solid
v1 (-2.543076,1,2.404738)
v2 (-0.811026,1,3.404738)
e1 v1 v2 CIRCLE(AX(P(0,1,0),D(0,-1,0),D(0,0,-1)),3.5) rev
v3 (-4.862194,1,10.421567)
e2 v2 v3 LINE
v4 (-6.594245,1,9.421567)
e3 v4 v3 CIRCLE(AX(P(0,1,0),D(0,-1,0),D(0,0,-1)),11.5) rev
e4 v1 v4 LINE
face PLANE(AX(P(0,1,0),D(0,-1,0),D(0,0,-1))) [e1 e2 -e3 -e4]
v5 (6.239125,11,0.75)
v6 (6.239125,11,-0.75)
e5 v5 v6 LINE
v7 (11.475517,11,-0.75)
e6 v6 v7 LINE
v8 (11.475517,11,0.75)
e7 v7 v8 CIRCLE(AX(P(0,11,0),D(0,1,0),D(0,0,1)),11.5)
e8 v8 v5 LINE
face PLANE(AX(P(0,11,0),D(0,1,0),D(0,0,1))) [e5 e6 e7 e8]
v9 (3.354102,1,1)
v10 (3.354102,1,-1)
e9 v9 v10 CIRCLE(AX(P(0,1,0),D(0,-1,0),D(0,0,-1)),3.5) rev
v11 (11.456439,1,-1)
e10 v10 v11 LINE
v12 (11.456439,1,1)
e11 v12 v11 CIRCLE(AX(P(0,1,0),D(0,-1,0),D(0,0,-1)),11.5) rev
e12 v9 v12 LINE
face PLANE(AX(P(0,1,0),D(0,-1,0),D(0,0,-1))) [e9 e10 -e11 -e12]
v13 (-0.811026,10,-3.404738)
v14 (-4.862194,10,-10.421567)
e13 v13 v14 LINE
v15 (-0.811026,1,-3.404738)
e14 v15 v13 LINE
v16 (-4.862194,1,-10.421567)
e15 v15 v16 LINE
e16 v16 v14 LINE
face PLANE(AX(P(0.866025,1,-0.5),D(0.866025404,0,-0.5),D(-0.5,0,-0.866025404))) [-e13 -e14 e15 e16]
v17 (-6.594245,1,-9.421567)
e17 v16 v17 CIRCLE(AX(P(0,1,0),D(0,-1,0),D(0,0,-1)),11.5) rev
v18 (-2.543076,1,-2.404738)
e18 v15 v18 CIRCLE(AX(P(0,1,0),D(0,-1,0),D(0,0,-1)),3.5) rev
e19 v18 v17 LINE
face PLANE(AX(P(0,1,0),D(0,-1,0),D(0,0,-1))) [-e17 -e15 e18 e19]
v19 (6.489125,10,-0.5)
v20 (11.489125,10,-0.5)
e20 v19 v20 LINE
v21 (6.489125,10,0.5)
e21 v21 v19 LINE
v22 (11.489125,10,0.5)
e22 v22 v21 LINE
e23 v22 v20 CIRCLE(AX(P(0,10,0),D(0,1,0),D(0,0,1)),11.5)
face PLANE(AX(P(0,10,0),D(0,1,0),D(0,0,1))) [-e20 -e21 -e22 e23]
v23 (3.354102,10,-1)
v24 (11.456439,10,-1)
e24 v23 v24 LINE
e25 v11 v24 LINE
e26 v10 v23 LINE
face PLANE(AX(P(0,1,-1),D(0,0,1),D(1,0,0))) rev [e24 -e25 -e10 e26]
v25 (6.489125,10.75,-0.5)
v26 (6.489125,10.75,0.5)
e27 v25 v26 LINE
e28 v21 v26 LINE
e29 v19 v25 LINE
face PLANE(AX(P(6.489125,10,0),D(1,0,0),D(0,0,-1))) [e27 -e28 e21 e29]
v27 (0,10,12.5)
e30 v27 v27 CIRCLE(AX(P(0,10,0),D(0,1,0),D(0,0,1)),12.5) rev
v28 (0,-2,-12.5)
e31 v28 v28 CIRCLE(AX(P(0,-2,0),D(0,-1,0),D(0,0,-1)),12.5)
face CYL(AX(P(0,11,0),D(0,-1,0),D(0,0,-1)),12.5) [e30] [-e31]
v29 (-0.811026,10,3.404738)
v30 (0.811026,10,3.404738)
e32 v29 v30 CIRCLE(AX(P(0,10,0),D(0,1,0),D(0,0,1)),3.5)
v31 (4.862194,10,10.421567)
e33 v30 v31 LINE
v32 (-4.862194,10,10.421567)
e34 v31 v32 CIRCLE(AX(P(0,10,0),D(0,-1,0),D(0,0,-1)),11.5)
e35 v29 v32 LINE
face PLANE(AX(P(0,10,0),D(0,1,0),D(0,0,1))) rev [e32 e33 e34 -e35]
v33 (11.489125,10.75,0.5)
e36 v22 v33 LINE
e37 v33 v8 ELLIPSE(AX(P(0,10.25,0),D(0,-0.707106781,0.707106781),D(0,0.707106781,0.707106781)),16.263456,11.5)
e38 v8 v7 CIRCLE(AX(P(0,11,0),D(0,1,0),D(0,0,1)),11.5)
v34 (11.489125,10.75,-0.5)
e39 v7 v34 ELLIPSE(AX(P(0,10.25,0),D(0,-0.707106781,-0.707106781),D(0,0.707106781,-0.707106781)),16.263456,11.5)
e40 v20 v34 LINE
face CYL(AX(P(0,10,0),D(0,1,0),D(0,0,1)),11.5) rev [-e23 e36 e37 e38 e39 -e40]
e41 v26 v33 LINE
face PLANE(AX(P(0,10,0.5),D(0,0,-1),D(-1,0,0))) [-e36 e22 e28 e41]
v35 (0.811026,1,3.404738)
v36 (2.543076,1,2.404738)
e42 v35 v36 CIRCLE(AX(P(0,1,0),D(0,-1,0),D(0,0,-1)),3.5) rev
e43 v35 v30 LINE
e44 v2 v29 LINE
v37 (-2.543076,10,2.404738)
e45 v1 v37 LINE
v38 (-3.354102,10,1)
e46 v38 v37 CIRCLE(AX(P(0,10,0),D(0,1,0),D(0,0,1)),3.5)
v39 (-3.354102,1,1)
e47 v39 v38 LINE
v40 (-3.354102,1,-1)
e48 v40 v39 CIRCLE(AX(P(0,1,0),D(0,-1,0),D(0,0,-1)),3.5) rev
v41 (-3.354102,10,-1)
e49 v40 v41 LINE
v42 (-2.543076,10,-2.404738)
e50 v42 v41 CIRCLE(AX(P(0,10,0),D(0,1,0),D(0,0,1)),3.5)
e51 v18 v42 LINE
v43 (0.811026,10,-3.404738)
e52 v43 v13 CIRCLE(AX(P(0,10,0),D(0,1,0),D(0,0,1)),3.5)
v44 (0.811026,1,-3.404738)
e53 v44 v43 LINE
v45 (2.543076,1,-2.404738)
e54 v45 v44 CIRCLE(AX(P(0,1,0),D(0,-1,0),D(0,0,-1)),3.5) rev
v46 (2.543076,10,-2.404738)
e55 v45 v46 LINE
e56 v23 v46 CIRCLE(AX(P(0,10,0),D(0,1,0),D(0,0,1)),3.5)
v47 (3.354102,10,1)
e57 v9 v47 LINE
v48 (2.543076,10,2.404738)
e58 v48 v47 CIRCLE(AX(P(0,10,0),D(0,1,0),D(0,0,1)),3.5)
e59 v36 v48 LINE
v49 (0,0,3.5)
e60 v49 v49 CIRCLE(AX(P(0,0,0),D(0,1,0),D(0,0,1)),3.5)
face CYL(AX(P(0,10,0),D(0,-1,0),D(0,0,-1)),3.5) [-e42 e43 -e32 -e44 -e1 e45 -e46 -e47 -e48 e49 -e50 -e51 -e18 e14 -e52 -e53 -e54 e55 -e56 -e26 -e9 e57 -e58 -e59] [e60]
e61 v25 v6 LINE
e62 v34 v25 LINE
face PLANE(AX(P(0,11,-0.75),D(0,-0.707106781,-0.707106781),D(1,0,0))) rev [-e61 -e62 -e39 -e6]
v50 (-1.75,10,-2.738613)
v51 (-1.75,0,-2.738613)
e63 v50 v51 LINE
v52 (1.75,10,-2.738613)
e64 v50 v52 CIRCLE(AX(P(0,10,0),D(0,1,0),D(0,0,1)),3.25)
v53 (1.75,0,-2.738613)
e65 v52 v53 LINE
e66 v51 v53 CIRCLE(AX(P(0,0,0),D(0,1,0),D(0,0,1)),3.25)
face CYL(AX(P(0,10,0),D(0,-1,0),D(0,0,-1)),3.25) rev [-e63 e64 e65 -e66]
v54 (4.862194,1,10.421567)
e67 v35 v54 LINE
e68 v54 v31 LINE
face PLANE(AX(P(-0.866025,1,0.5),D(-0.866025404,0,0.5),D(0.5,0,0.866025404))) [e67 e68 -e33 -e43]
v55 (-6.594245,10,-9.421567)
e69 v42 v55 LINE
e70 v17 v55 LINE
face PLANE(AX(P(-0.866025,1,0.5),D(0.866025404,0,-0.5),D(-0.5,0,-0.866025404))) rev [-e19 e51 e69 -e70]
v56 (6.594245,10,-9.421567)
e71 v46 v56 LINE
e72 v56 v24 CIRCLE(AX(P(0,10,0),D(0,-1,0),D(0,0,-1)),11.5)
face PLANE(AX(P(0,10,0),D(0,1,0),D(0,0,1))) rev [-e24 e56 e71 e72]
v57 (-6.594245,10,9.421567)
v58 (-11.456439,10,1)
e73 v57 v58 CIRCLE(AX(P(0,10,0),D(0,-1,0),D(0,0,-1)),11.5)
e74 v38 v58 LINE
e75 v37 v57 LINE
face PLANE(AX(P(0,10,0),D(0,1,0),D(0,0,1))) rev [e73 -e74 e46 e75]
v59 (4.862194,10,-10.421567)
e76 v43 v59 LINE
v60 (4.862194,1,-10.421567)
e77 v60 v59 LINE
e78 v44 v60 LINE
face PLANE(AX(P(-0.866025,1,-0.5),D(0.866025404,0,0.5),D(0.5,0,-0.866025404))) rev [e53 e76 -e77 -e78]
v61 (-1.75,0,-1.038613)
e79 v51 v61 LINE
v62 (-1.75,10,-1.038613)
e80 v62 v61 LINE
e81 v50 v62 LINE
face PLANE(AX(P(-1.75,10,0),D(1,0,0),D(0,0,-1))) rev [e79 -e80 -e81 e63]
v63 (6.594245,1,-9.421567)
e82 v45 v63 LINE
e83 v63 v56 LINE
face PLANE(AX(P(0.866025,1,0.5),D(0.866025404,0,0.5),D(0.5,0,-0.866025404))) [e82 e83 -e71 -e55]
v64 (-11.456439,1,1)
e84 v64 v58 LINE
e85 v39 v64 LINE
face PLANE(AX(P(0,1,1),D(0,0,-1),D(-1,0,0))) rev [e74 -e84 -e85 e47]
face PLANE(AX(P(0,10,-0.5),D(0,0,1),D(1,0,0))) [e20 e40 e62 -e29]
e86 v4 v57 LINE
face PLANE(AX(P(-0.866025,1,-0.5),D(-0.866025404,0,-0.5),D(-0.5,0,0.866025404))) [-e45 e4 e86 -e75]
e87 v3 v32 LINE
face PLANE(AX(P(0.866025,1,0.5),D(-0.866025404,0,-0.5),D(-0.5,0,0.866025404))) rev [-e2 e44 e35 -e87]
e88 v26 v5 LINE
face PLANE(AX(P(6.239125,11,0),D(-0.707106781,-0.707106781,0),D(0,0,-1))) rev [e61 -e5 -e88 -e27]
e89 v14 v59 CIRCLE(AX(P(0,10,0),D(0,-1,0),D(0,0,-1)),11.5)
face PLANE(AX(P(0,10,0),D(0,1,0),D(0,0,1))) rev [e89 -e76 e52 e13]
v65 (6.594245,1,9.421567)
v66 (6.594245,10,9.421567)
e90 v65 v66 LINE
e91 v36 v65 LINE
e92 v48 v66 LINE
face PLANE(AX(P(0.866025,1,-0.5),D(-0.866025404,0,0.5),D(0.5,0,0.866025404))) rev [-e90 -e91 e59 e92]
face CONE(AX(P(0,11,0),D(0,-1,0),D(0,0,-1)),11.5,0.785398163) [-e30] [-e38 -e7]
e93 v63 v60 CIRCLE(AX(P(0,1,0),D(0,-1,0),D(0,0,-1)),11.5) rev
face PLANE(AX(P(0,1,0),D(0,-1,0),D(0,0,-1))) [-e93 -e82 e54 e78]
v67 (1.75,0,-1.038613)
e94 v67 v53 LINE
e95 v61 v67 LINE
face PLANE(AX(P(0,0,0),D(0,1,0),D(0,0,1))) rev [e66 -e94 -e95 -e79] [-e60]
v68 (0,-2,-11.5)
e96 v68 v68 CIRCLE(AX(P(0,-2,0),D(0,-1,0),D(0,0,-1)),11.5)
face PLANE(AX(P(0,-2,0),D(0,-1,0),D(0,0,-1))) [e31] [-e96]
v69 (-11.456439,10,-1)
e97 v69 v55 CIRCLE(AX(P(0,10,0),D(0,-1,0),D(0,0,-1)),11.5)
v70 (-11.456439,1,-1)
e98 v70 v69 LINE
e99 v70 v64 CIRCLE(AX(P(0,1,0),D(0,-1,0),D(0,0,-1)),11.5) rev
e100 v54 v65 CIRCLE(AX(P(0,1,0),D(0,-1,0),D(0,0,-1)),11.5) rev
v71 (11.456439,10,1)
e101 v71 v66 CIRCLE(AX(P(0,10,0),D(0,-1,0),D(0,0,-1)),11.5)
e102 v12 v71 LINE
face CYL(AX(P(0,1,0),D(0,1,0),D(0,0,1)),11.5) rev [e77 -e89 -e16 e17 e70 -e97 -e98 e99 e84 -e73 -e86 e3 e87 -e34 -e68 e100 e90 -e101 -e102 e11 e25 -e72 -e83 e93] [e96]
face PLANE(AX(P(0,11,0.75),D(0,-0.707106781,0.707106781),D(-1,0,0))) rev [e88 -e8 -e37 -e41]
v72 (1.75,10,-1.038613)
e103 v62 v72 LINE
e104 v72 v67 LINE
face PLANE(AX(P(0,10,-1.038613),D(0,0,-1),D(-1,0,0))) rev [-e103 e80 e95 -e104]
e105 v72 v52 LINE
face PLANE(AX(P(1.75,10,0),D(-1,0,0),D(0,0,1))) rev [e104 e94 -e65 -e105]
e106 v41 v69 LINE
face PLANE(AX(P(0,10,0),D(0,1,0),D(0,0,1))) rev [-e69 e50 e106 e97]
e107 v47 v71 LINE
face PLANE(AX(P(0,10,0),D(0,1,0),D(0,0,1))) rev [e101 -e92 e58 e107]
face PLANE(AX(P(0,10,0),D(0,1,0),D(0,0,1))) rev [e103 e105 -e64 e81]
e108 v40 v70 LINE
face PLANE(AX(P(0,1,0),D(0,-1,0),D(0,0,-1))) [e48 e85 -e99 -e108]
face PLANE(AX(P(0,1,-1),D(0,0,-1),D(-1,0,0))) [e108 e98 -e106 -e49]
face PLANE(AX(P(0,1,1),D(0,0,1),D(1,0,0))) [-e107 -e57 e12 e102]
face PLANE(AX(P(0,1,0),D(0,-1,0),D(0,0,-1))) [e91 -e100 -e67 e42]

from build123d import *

# Parameters (mm, degrees)
SKETCH1_R           = 3.5
BOSS_EXTRUDE1_DEPTH = 10
SKETCH2_R           = 12.5
BOSS_EXTRUDE2_DEPTH = 1
BOSS_EXTRUDE3_START = 9
SKETCH3_R           = 12.5
SKETCH3_R_2         = 11.5
BOSS_EXTRUDE3_DEPTH = 9
BOSS_EXTRUDE4_START = 12
SKETCH3_4_R         = 12.5
SKETCH3_4_R_2       = 11.5
BOSS_EXTRUDE4_DEPTH = 12
CHAMFER1_SIZE       = 1
CUT_EXTRUDE4_START  = -1
CUT_EXTRUDE4_DEPTH  = 1
CHAMFER2_SIZE       = 0.25


with BuildPart() as part:
    # Sketch1 → Boss-Extrude1 (new body)
    with BuildSketch(Plane(origin=(0, 0, 0), x_dir=(1, 0, 0), z_dir=(0, 1, 0))):
        with Locations(Location((0, 0, 0), (0, 0, 270))):
            Circle(SKETCH1_R)
        with BuildLine():
            Line((-1.75, 1.038612788), (1.75, 1.038612788))
            Line((1.75, 1.038612788), (1.75, 2.738612788))
            ThreePointArc((1.75, 2.738612788), (0, -3.25), (-1.75, 2.738612788))
            Line((-1.75, 2.738612788), (-1.75, 1.038612788))
        make_face(mode=Mode.SUBTRACT)
    extrude(amount=BOSS_EXTRUDE1_DEPTH)

    # Sketch2 → Boss-Extrude2 (add)
    with BuildSketch(Plane(origin=(0, 10, 0), x_dir=(1, 0, 0), z_dir=(0, 1, 0))):
        with Locations(Location((0, 0, 0), (0, 0, 270))):
            Circle(SKETCH2_R)
    extrude(amount=BOSS_EXTRUDE2_DEPTH)

    # Sketch3 → Boss-Extrude3 (add)
    # profile 1 of 8: a face of its own
    with BuildSketch(Plane.XZ.offset(-10).offset(BOSS_EXTRUDE3_START)):
        with Locations(Location((0, 0, 0), (0, 0, 270))):
            Circle(SKETCH3_R)
        Circle(SKETCH3_R_2, mode=Mode.SUBTRACT)
    # profile 2 of 8: a face of its own
    with BuildSketch(Plane.XZ.offset(-10).offset(BOSS_EXTRUDE3_START)):
        with BuildLine():
            Line((-6.594245022, 9.421567416), (-2.543076387, 2.40473751))
            ThreePointArc((-2.543076387, 2.40473751), (-1.75, 3.031088913), (-0.811025579, 3.40473751))
            Line((-0.811025579, 3.40473751), (-4.862194215, 10.421567416))
            ThreePointArc((-4.862194215, 10.421567416), (-5.75, 9.959292144), (-6.594245022, 9.421567416))
        make_face()
    # profile 3 of 8: a face of its own
    with BuildSketch(Plane.XZ.offset(-10).offset(BOSS_EXTRUDE3_START)):
        with BuildLine():
            Line((-11.5, 0), (-3.5, 0))
            ThreePointArc((-3.5, 0), (-3.463333429, 0.505293538), (-3.354101966, 1))
            Line((-3.354101966, 1), (-11.456439237, 1))
            ThreePointArc((-11.456439237, 1), (-11.489104648, 0.50047416), (-11.5, 0))
        make_face()
    # profile 4 of 8: a face of its own
    with BuildSketch(Plane.XZ.offset(-10).offset(BOSS_EXTRUDE3_START)):
        with BuildLine():
            ThreePointArc((-3.354101966, -1), (-3.463333429, -0.505293538), (-3.5, 0))
            Line((-3.5, 0), (-11.5, 0))
            ThreePointArc((-11.5, 0), (-11.489104648, -0.50047416), (-11.456439237, -1))
            Line((-11.456439237, -1), (-3.354101966, -1))
        make_face()
    # profile 5 of 8: a face of its own
    with BuildSketch(Plane.XZ.offset(-10).offset(BOSS_EXTRUDE3_START)):
        with BuildLine():
            Line((11.456439237, 1), (3.354101966, 1))
            ThreePointArc((3.354101966, 1), (3.463333429, 0.505293538), (3.5, 0))
            ThreePointArc((3.5, 0), (3.463333429, -0.505293538), (3.354101966, -1))
            Line((3.354101966, -1), (11.456439237, -1))
            ThreePointArc((11.456439237, -1), (11.489104648, -0.50047416), (11.5, 0))
            ThreePointArc((11.5, 0), (11.489104648, 0.50047416), (11.456439237, 1))
        make_face()
    # profile 6 of 8: a face of its own
    with BuildSketch(Plane.XZ.offset(-10).offset(BOSS_EXTRUDE3_START)):
        with BuildLine():
            ThreePointArc((2.543076387, -2.40473751), (1.75, -3.031088913), (0.811025579, -3.40473751))
            Line((0.811025579, -3.40473751), (4.862194215, -10.421567416))
            ThreePointArc((4.862194215, -10.421567416), (5.75, -9.959292144), (6.594245022, -9.421567416))
            Line((6.594245022, -9.421567416), (2.543076387, -2.40473751))
        make_face()
    # profile 7 of 8: a face of its own
    with BuildSketch(Plane.XZ.offset(-10).offset(BOSS_EXTRUDE3_START)):
        with BuildLine():
            ThreePointArc((-0.811025579, -3.40473751), (-1.75, -3.031088913), (-2.543076387, -2.40473751))
            Line((-2.543076387, -2.40473751), (-6.594245022, -9.421567416))
            ThreePointArc((-6.594245022, -9.421567416), (-5.75, -9.959292144), (-4.862194215, -10.421567416))
            Line((-4.862194215, -10.421567416), (-0.811025579, -3.40473751))
        make_face()
    # profile 8 of 8: a face of its own
    with BuildSketch(Plane.XZ.offset(-10).offset(BOSS_EXTRUDE3_START)):
        with BuildLine():
            Line((4.862194215, 10.421567416), (0.811025579, 3.40473751))
            ThreePointArc((0.811025579, 3.40473751), (1.75, 3.031088913), (2.543076387, 2.40473751))
            Line((2.543076387, 2.40473751), (6.594245022, 9.421567416))
            ThreePointArc((6.594245022, 9.421567416), (5.75, 9.959292144), (4.862194215, 10.421567416))
        make_face()
    extrude(amount=-BOSS_EXTRUDE3_DEPTH)

    # Sketch3<4> → Boss-Extrude4 (add)
    with BuildSketch(Plane.XZ.offset(-10).offset(BOSS_EXTRUDE4_START)):
        with Locations(Location((0, 0, 0), (0, 0, 270))):
            Circle(SKETCH3_4_R)
        with Locations(Location((0, 0, 0), (0, 0, 64.988541976))):
            Circle(SKETCH3_4_R_2, mode=Mode.SUBTRACT)
    extrude(amount=-BOSS_EXTRUDE4_DEPTH)

    # Chamfer1
    chamfer1_edges = [part.edges().sort_by_distance(p)[0] for p in [
        (0, 11, -12.5),
    ]]
    chamfer(chamfer1_edges, length=CHAMFER1_SIZE - 0.0001)  # a hair under: the kernel refuses the full size

    # Sketch4 → Cut-Extrude4 (cut)
    with BuildSketch(Plane(origin=(0, 11, 0), x_dir=(1, 0, 0), z_dir=(0, 1, 0)).offset(CUT_EXTRUDE4_START)):
        with BuildLine():
            Line((6.489125293, 0.5), (6.489125293, 0))
            Line((6.489125293, 0), (11.5, 0))
            ThreePointArc((11.5, 0), (11.497281002, 0.250059123), (11.489125293, 0.5))
            Line((11.489125293, 0.5), (6.489125293, 0.5))
        make_face()
        with BuildLine():
            Line((11.5, 0), (6.489125293, 0))
            Line((6.489125293, 0), (6.489125293, -0.5))
            Line((6.489125293, -0.5), (11.489125293, -0.5))
            ThreePointArc((11.489125293, -0.5), (11.497281002, -0.250059123), (11.5, 0))
        make_face()
    extrude(amount=CUT_EXTRUDE4_DEPTH, mode=Mode.SUBTRACT)

    # Chamfer2
    chamfer2_edges = [part.edges().sort_by_distance(p)[0] for p in [
        (6.489125293, 11, 0),
        (8.989125293, 11, -0.5),
        (8.989125293, 11, 0.5),
    ]]
    chamfer(chamfer2_edges, length=CHAMFER2_SIZE)


solid = part.part
